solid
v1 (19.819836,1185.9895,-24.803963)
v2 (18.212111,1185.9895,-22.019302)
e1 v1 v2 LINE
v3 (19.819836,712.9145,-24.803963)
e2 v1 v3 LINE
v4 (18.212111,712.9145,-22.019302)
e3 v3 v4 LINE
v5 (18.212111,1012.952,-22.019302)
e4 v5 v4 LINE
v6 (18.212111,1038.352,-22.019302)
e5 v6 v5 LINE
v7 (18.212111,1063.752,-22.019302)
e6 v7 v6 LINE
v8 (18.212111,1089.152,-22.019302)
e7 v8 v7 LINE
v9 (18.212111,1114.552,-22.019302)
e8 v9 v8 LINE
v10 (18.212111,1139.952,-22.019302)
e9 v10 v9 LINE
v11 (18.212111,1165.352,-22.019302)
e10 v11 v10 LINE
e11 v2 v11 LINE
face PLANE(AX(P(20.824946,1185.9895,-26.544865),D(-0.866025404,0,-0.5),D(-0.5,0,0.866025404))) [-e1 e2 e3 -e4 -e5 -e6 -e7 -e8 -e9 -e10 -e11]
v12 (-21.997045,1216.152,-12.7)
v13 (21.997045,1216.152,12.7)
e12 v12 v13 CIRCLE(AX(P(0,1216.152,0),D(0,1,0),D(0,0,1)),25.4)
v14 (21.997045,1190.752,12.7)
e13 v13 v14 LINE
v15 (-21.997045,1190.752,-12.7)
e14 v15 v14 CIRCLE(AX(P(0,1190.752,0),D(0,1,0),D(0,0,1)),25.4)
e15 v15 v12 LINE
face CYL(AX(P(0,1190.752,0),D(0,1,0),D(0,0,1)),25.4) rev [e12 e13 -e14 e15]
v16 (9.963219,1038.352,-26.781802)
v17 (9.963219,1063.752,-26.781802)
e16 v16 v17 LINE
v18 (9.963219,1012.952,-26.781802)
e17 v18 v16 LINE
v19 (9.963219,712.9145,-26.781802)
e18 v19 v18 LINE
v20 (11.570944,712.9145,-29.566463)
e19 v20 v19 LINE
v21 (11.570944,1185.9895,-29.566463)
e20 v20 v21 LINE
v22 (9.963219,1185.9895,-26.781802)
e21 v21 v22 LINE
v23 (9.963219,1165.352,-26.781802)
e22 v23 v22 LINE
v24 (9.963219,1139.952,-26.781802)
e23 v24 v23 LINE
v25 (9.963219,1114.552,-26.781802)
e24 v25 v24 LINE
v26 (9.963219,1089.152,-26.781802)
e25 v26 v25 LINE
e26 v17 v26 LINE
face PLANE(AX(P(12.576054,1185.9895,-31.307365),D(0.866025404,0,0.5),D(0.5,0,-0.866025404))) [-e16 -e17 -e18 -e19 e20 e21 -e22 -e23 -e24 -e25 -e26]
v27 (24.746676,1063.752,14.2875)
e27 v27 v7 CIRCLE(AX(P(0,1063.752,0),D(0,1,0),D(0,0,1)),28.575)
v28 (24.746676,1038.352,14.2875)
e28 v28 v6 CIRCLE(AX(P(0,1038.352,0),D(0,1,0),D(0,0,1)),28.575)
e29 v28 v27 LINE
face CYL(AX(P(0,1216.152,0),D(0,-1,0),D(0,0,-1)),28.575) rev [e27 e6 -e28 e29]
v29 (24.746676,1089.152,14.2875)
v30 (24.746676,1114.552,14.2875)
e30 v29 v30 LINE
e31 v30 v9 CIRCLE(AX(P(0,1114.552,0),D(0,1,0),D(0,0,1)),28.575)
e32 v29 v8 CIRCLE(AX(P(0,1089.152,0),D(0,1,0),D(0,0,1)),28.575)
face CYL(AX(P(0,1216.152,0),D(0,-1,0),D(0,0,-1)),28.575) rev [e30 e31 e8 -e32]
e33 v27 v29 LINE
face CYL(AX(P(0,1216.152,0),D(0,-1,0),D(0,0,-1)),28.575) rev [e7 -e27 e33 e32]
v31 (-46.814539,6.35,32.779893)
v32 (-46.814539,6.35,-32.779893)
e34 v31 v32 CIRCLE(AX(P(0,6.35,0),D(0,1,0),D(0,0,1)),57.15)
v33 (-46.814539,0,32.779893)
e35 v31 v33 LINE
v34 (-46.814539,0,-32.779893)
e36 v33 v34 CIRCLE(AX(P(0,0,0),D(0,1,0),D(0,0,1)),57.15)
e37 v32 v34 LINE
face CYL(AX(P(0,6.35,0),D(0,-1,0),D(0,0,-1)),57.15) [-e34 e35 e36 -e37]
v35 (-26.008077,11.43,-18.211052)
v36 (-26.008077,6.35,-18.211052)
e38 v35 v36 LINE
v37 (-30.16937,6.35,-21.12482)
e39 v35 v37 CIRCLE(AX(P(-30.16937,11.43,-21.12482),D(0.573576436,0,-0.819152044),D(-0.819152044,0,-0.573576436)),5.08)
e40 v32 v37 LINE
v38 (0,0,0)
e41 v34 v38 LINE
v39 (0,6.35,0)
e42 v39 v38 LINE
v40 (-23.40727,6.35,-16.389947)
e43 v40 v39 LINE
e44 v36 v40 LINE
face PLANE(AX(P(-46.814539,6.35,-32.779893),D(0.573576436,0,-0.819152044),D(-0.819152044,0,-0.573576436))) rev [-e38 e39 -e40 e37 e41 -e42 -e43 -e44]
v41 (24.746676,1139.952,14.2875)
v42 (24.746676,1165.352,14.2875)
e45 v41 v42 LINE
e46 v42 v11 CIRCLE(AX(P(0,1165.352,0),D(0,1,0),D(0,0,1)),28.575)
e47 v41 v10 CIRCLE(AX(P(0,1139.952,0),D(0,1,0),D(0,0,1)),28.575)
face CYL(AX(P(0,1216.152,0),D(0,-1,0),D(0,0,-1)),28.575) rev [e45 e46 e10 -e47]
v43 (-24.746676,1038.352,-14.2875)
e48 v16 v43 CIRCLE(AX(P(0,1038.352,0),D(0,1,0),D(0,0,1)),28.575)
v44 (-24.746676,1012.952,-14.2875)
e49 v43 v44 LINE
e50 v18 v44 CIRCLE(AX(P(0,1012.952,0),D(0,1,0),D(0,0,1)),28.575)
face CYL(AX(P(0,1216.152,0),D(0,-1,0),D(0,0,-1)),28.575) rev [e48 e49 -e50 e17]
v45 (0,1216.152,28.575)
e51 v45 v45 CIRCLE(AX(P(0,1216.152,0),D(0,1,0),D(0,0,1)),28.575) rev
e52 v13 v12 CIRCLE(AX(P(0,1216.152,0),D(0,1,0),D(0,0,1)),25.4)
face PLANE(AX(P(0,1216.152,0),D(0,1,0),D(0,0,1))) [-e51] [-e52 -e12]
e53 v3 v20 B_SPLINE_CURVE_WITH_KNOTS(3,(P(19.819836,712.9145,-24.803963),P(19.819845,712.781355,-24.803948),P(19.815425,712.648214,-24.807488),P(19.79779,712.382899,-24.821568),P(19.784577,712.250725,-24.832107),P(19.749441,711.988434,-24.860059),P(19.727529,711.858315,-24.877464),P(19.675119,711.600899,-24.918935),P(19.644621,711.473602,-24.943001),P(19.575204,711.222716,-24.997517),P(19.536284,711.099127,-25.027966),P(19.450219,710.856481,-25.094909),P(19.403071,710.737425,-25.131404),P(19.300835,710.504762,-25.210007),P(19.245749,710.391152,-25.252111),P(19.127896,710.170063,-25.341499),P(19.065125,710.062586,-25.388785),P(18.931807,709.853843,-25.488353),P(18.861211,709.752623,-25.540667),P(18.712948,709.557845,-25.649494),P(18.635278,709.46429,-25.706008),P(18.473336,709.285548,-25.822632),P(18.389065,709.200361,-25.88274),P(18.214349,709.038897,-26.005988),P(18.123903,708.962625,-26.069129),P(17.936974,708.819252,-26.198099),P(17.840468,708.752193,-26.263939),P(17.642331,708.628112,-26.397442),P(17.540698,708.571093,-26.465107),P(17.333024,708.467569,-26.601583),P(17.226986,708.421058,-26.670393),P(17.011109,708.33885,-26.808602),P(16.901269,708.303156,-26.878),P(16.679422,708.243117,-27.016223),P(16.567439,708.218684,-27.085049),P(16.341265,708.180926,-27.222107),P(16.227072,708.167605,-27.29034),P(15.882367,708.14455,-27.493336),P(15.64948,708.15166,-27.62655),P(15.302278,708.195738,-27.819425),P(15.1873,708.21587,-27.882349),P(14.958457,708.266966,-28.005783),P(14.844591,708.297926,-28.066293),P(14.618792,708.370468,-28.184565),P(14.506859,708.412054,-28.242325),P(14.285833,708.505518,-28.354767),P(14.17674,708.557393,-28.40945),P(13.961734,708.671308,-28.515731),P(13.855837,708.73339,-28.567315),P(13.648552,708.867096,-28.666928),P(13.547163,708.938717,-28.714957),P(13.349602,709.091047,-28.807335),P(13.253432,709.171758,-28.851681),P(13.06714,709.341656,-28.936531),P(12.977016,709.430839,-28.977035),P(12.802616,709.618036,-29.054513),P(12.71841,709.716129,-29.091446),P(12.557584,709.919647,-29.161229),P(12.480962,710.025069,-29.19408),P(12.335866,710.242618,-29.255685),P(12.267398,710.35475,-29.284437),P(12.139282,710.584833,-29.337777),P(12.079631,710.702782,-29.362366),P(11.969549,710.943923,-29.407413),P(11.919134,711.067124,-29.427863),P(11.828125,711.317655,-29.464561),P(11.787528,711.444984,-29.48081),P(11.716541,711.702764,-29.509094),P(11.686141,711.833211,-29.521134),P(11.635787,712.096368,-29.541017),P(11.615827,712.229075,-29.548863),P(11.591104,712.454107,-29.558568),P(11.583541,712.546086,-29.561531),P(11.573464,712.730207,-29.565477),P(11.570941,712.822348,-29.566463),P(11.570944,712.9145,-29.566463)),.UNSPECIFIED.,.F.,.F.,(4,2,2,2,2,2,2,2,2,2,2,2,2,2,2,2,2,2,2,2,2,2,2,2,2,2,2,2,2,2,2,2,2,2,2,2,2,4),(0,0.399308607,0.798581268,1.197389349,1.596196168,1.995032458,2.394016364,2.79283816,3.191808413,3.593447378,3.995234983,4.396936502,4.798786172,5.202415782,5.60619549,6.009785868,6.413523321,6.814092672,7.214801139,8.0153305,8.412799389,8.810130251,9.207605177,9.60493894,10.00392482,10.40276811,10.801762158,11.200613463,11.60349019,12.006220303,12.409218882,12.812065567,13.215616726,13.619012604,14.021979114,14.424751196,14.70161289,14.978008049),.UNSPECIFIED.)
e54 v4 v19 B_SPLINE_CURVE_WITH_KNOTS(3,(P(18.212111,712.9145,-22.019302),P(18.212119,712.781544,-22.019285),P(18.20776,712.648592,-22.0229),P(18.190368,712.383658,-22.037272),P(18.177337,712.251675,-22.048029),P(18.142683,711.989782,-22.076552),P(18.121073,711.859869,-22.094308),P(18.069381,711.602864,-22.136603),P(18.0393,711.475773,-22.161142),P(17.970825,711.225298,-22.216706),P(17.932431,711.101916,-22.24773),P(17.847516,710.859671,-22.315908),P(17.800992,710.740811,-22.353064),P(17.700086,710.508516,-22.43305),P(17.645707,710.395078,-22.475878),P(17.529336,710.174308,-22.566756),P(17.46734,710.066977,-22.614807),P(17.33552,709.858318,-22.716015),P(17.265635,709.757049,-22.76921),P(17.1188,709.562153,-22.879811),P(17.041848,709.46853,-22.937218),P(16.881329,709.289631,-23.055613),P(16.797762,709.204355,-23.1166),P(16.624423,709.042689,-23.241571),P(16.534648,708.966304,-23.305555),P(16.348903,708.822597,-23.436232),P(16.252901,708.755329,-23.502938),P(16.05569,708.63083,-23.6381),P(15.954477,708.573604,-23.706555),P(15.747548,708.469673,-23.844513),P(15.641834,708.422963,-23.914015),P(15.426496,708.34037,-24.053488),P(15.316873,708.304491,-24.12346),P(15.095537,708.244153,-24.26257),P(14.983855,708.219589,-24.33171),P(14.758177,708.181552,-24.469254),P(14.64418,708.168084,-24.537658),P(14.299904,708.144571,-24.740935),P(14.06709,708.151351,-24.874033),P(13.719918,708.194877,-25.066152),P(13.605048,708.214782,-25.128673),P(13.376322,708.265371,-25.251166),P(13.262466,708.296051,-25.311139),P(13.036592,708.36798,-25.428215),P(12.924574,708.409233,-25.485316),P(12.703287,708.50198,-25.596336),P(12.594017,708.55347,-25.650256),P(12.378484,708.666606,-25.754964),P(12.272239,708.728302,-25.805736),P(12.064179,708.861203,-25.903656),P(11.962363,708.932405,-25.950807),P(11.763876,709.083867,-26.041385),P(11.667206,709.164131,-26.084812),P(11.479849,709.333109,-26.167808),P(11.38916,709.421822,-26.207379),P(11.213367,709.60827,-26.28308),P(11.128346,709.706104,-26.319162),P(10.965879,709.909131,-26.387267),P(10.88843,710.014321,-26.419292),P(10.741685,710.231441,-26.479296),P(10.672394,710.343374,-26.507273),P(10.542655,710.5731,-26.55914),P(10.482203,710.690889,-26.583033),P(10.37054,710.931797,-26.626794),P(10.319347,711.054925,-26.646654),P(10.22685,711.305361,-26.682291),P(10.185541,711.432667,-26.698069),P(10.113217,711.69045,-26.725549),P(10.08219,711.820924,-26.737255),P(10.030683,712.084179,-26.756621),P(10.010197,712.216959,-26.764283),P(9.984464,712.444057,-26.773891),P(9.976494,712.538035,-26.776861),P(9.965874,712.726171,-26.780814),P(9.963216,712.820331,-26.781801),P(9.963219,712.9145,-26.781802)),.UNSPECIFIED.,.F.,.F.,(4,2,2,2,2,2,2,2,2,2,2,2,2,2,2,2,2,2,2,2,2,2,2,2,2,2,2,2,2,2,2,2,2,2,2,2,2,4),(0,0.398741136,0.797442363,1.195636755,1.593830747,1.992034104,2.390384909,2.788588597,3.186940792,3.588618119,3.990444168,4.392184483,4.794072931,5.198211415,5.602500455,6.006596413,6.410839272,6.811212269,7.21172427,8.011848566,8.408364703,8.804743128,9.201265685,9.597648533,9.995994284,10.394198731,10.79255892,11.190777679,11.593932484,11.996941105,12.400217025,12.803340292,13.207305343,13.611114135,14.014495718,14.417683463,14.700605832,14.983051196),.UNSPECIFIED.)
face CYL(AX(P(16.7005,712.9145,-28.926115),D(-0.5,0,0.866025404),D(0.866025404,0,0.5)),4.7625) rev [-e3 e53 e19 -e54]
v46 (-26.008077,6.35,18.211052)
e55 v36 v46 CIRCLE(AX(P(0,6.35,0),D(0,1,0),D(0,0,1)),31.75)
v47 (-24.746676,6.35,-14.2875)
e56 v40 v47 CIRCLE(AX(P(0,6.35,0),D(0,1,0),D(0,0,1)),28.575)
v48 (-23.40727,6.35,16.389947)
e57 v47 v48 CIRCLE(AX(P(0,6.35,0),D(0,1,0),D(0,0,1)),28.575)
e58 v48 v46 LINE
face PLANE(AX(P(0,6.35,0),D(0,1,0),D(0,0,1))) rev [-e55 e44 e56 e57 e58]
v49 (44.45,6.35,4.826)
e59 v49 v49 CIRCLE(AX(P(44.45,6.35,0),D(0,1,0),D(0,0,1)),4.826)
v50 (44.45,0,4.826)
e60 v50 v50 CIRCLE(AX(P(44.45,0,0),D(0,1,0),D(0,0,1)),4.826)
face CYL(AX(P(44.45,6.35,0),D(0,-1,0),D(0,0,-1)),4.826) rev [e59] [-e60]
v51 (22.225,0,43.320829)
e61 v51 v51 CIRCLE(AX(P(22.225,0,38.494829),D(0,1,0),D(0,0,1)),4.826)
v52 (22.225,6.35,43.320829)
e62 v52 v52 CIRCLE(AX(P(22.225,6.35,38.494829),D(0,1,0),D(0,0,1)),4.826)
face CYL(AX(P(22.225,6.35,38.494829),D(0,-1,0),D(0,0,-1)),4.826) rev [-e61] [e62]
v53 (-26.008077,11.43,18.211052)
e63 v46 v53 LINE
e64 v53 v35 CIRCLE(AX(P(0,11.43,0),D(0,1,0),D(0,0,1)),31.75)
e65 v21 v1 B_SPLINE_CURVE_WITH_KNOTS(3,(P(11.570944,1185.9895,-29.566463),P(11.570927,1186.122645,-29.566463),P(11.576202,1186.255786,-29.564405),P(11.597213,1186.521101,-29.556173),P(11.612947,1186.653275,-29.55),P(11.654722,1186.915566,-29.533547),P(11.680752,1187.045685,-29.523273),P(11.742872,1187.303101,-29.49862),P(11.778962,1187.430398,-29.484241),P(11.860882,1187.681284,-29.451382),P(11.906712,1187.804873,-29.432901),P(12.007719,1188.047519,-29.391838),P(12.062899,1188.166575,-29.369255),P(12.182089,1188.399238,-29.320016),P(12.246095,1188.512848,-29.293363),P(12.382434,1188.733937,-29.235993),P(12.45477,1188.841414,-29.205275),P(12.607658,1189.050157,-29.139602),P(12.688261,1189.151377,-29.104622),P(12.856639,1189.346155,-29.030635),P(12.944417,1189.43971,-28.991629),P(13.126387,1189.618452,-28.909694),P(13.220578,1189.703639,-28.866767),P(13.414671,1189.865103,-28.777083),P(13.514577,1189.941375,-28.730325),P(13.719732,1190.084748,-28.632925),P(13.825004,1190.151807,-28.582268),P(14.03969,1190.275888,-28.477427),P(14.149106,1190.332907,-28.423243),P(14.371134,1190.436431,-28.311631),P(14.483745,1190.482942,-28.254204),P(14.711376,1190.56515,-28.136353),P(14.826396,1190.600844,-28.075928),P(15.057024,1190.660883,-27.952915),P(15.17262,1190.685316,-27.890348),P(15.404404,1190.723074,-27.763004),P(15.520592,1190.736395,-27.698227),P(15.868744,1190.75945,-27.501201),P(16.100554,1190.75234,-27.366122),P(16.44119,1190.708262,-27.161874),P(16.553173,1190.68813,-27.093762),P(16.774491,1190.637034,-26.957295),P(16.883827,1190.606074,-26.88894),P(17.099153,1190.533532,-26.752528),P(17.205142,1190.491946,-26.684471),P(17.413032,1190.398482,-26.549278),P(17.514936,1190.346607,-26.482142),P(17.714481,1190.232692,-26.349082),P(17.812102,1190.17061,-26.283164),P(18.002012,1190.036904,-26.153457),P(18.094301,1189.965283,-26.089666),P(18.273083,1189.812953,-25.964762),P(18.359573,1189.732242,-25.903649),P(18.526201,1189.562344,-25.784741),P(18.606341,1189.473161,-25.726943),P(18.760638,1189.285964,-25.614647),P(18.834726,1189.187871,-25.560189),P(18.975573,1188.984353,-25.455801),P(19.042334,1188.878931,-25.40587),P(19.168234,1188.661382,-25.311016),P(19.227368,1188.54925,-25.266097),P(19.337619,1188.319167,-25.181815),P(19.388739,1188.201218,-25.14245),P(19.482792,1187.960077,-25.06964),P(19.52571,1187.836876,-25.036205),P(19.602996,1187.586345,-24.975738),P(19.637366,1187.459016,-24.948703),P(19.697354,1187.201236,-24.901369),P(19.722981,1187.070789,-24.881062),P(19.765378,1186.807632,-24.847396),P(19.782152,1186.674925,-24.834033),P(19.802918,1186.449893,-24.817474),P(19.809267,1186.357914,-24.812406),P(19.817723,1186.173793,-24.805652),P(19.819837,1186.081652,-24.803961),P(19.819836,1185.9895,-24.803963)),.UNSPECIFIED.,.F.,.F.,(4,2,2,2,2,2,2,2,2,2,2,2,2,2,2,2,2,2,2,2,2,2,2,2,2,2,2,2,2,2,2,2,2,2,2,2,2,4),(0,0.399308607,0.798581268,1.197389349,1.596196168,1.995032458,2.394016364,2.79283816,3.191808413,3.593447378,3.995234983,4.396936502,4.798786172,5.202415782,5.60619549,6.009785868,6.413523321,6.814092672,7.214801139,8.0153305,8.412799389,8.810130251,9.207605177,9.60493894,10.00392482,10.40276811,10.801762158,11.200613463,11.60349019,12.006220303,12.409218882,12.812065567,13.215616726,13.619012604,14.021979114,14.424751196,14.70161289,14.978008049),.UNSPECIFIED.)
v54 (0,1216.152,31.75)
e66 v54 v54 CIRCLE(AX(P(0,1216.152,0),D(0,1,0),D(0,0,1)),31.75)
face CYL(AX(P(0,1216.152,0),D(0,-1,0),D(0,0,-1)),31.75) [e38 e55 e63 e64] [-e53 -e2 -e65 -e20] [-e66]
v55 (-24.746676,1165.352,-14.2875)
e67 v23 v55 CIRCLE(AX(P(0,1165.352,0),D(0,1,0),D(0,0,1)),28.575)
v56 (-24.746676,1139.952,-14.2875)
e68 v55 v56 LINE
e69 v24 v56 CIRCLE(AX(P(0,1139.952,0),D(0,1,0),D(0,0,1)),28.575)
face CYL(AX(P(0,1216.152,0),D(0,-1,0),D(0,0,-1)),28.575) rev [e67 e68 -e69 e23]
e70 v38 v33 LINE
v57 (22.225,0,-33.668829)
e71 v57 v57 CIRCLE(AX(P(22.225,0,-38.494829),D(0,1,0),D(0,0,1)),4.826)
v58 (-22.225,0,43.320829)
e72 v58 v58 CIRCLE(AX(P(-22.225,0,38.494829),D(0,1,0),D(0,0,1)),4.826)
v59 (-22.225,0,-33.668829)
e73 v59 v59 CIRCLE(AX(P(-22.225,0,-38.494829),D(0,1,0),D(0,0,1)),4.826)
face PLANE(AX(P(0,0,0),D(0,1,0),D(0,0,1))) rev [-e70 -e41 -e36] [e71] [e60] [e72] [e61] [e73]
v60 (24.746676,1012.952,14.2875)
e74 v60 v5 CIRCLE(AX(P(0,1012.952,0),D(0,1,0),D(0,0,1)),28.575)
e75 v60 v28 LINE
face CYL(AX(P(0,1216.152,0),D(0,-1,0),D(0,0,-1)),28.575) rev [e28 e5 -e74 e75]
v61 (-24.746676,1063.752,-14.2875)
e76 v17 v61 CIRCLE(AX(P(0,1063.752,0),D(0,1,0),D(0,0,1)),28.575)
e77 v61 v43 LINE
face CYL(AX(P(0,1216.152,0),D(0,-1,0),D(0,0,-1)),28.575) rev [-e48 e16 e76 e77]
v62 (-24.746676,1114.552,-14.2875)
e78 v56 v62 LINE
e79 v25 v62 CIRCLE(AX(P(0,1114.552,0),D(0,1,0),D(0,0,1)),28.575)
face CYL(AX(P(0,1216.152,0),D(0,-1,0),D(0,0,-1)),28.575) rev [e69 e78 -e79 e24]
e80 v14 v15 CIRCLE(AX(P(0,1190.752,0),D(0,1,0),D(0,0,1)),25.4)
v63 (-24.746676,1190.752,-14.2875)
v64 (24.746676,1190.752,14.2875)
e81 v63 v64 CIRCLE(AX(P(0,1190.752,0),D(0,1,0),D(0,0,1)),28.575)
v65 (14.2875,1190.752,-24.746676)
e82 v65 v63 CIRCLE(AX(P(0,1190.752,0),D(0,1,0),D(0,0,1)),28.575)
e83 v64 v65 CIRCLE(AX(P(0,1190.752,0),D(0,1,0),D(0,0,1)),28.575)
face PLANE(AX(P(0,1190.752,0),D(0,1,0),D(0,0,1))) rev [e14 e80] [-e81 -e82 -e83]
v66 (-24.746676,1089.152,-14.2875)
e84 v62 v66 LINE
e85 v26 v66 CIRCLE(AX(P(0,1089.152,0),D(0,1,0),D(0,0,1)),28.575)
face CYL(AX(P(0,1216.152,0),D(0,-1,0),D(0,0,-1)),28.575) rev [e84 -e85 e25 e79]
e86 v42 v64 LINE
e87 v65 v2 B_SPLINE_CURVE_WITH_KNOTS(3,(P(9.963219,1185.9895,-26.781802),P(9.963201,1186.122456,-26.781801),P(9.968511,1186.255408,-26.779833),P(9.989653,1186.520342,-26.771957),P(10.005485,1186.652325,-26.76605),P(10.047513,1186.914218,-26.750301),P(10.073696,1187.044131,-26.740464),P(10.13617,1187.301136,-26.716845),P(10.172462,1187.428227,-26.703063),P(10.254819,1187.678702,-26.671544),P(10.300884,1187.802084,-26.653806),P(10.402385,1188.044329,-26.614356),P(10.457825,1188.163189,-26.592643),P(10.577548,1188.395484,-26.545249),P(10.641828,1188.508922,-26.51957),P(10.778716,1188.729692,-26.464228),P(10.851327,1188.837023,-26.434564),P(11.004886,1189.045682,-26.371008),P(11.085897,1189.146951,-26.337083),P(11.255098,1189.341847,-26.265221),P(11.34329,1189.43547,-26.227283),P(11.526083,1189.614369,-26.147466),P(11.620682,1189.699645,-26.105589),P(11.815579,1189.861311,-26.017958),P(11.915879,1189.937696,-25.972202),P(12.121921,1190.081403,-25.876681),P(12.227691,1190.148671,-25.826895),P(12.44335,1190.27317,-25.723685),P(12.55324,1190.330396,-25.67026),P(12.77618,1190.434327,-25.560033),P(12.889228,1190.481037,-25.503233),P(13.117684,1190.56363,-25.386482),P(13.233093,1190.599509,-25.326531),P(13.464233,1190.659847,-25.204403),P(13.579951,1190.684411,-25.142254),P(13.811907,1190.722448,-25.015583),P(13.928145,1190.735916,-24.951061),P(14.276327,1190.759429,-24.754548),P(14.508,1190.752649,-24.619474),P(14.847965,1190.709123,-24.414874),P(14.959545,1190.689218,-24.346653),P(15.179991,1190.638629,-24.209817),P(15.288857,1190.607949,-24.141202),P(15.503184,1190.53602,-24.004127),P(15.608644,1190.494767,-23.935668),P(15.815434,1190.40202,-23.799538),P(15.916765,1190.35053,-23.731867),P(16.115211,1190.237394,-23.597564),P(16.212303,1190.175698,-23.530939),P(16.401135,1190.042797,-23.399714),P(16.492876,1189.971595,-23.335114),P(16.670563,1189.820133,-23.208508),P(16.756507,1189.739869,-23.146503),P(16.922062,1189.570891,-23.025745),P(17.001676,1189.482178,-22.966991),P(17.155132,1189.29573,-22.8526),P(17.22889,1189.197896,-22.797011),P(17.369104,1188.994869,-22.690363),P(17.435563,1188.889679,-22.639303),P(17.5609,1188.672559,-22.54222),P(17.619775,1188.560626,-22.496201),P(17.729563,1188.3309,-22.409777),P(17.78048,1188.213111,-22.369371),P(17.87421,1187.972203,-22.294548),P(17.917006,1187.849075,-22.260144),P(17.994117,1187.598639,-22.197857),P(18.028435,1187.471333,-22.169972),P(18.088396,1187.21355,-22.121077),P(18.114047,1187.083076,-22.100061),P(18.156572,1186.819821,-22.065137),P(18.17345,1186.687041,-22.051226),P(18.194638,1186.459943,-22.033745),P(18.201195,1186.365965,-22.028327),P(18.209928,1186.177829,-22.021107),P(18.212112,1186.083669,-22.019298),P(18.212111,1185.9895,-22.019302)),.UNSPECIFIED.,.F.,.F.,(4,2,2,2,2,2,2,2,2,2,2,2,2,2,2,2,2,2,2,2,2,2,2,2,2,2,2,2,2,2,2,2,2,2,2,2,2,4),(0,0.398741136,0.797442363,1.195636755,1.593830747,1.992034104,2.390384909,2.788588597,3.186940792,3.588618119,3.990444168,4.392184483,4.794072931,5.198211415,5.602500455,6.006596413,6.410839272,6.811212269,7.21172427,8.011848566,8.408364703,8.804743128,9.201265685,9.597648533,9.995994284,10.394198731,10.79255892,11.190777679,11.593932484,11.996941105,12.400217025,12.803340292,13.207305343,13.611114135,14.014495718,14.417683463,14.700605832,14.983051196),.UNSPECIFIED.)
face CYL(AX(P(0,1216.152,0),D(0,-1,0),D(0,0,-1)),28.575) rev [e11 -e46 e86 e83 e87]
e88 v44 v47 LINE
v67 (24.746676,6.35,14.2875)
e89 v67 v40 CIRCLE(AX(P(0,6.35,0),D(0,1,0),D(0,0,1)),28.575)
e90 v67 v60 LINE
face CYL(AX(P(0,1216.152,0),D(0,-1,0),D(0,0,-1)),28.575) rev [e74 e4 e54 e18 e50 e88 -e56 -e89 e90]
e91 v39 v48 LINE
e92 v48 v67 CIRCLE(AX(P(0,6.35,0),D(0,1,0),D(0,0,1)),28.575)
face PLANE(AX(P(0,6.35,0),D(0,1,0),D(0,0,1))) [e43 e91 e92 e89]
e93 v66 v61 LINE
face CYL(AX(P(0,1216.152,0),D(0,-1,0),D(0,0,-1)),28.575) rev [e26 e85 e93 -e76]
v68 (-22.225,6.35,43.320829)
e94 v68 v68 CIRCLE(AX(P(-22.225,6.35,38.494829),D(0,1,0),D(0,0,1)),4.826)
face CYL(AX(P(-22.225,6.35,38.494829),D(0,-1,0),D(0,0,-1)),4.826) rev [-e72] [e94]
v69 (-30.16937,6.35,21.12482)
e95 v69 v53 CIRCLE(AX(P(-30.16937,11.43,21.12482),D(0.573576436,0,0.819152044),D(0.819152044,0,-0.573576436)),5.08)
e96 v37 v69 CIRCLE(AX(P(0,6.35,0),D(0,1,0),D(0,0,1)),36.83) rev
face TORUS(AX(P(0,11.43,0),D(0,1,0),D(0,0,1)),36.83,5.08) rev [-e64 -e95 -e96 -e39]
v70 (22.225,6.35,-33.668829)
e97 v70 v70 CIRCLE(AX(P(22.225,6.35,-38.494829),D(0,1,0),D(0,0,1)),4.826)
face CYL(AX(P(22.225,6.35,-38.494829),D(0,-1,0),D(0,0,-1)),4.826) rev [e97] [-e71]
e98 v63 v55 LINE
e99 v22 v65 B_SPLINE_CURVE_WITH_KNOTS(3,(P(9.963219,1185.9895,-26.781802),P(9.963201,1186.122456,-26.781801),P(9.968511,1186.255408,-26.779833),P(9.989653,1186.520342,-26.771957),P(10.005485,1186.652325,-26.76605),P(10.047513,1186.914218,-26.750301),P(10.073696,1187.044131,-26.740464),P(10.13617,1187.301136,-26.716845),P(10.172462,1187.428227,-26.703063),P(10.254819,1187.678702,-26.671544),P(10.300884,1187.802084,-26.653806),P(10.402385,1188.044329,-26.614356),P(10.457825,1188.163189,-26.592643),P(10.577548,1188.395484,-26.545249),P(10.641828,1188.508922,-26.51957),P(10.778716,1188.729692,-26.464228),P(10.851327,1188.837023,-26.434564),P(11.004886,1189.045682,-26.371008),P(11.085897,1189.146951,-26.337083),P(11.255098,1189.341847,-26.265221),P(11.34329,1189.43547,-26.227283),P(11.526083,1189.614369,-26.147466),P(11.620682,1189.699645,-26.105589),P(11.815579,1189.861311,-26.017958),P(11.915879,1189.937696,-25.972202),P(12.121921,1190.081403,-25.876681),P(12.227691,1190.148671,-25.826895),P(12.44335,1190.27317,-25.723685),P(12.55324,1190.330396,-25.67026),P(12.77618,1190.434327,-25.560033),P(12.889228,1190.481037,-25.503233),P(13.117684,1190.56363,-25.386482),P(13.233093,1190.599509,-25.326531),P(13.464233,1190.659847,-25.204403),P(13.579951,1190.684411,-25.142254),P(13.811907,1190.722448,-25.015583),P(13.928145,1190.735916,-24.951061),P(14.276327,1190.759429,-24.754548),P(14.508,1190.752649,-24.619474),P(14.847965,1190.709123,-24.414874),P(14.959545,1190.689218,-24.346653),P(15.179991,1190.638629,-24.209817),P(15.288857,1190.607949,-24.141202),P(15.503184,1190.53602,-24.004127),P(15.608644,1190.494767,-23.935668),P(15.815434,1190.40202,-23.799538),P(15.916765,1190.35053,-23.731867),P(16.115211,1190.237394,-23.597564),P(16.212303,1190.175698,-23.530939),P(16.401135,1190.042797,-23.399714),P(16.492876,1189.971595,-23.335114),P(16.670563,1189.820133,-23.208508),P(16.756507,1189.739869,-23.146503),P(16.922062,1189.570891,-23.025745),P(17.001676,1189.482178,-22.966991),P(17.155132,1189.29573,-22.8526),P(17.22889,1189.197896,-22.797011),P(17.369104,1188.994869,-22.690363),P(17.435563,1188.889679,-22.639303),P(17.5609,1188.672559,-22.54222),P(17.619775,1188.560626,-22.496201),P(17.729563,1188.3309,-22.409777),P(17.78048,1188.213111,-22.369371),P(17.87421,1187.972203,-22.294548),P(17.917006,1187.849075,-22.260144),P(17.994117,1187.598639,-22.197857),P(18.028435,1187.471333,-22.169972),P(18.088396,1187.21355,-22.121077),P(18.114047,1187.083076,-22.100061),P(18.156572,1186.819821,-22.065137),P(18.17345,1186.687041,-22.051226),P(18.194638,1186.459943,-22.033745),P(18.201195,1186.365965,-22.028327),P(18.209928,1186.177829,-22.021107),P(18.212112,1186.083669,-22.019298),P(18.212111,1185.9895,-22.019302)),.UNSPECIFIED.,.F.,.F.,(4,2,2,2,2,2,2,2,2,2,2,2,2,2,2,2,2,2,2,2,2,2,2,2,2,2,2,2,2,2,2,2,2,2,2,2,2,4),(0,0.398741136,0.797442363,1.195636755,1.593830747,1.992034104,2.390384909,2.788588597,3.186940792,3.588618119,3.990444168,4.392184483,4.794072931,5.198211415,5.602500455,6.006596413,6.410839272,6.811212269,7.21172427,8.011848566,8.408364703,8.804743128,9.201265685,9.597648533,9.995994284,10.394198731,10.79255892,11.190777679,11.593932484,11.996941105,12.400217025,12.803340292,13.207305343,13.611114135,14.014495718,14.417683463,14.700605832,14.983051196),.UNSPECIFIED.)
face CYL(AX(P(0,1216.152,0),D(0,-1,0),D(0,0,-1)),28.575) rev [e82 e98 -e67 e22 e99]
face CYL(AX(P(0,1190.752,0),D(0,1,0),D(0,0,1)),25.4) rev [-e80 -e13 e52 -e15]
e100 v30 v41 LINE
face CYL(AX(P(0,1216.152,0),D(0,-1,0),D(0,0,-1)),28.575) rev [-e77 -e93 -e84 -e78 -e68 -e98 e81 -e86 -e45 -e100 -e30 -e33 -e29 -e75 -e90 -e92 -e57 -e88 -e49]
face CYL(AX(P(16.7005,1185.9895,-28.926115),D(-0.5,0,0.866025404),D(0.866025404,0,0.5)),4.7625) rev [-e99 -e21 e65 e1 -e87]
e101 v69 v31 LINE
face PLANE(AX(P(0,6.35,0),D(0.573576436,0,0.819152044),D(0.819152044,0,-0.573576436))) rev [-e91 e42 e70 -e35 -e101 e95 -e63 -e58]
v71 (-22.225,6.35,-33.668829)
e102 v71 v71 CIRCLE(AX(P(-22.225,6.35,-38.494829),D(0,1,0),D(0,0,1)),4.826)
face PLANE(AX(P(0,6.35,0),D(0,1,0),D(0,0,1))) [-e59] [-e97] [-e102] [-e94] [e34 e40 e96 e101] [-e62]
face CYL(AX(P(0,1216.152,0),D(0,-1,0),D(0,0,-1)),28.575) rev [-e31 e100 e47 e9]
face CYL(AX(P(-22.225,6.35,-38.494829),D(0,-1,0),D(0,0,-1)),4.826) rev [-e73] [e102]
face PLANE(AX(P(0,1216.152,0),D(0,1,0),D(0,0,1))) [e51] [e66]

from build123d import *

# Parameters (mm, degrees)
SKETCH1_R               = 4.826
BOSS_EXTRUDE1_DEPTH     = 6.35
SKETCH2_R               = 31.75
SKETCH2_R_2             = 28.575
BOSS_EXTRUDE2_DEPTH     = 1209.802
BOSS_EXTRUDE3_START     = -25.4
SKETCH3_R               = 28.575
SKETCH3_R_2             = 25.4
BOSS_EXTRUDE3_DEPTH     = 25.4
CUT_EXTRUDE1_DEPTH      = 6.35
CUT_EXTRUDE1_DEPTH_BACK = 6.35
FILLET1_ANGLE           = 290


with BuildPart() as part:
    # Sketch1 → Boss-Extrude1 (new body)
    with BuildSketch(Plane(origin=(0, 0, 0), x_dir=(1, 0, 0), z_dir=(0, 1, 0))):
        with BuildLine():
            Line((-46.814539331, 32.779893337), (0, 0))
            Line((0, 0), (-46.814539331, -32.779893337))
            ThreePointArc((-46.814539331, -32.779893337), (57.15, 0), (-46.814539331, 32.779893337))
        make_face()
        with Locations(Location((44.45, 0, 0), (0, 0, 270))):
            Circle(SKETCH1_R, mode=Mode.SUBTRACT)
        with Locations(Location((22.225, -38.494829198, 0), (0, 0, 270))):
            Circle(SKETCH1_R, mode=Mode.SUBTRACT)
        with Locations(Location((-22.225, -38.494829198, 0), (0, 0, 270))):
            Circle(SKETCH1_R, mode=Mode.SUBTRACT)
        with Locations(Location((-22.225, 38.494829198, 0), (0, 0, 270))):
            Circle(SKETCH1_R, mode=Mode.SUBTRACT)
        with Locations(Location((22.225, 38.494829198, 0), (0, 0, 270))):
            Circle(SKETCH1_R, mode=Mode.SUBTRACT)
    extrude(amount=BOSS_EXTRUDE1_DEPTH)

    # Sketch2 → Boss-Extrude2 (add)
    with BuildSketch(Plane(origin=(0, 6.35, 0), x_dir=(1, 0, 0), z_dir=(0, 1, 0))):
        with Locations(Location((0, 0, 0), (0, 0, 145))):
            Circle(SKETCH2_R)
        with Locations(Location((0, 0, 0), (0, 0, 145))):
            Circle(SKETCH2_R_2, mode=Mode.SUBTRACT)
    extrude(amount=BOSS_EXTRUDE2_DEPTH)

    # Sketch3 → Boss-Extrude3 (add)
    with BuildSketch(Plane(origin=(0, 1216.152, 0), x_dir=(1, 0, 0), z_dir=(0, 1, 0)).offset(BOSS_EXTRUDE3_START)):
        with Locations(Location((0, 0, 0), (0, 0, 145))):
            Circle(SKETCH3_R)
        with Locations(Location((0, 0, 0), (0, 0, 270))):
            Circle(SKETCH3_R_2, mode=Mode.SUBTRACT)
    extrude(amount=BOSS_EXTRUDE3_DEPTH)

    # Sketch4 → Cut-Extrude1 (cut, two sides: drawn at the far end of the back side and taken through both)
    with BuildSketch(Plane(origin=(13.5255, 0, -23.426853198), x_dir=(-0.8660254037844382, 0, -0.5000000000000009), z_dir=(0.5000000000000009, 0, -0.8660254037844382)).offset(-CUT_EXTRUDE1_DEPTH_BACK)):
        with BuildLine():
            Line((4.7625, 1185.9895), (4.7625, 712.9145))
            ThreePointArc((4.7625, 712.9145), (0, 708.152), (-4.7625, 712.9145))
            Line((-4.7625, 712.9145), (-4.7625, 1185.9895))
            ThreePointArc((-4.7625, 1185.9895), (0, 1190.752), (4.7625, 1185.9895))
        make_face()
    extrude(amount=CUT_EXTRUDE1_DEPTH + CUT_EXTRUDE1_DEPTH_BACK, mode=Mode.SUBTRACT)

    # Fillet1: read off the stored shape, not the designer's step
    # Fillet1 outline → Fillet1 (revolve)
    with BuildSketch(Plane(origin=(0, 0, 0), x_dir=(-0.8191520442889906, 0, 0.5735764363510478), z_dir=(-0.5735764363510478, 0, -0.8191520442889906))):
        with BuildLine():
            ThreePointArc((36.83, 6.35), (33.237897552, 7.837897552), (31.75, 11.43))
            Line((31.75, 11.43), (31.75, 6.35))
            Line((31.75, 6.35), (36.83, 6.35))
        make_face()
    revolve(axis=Axis((0, 0, 0), (0, 1, 0)), revolution_arc=FILLET1_ANGLE)


solid = part.part
